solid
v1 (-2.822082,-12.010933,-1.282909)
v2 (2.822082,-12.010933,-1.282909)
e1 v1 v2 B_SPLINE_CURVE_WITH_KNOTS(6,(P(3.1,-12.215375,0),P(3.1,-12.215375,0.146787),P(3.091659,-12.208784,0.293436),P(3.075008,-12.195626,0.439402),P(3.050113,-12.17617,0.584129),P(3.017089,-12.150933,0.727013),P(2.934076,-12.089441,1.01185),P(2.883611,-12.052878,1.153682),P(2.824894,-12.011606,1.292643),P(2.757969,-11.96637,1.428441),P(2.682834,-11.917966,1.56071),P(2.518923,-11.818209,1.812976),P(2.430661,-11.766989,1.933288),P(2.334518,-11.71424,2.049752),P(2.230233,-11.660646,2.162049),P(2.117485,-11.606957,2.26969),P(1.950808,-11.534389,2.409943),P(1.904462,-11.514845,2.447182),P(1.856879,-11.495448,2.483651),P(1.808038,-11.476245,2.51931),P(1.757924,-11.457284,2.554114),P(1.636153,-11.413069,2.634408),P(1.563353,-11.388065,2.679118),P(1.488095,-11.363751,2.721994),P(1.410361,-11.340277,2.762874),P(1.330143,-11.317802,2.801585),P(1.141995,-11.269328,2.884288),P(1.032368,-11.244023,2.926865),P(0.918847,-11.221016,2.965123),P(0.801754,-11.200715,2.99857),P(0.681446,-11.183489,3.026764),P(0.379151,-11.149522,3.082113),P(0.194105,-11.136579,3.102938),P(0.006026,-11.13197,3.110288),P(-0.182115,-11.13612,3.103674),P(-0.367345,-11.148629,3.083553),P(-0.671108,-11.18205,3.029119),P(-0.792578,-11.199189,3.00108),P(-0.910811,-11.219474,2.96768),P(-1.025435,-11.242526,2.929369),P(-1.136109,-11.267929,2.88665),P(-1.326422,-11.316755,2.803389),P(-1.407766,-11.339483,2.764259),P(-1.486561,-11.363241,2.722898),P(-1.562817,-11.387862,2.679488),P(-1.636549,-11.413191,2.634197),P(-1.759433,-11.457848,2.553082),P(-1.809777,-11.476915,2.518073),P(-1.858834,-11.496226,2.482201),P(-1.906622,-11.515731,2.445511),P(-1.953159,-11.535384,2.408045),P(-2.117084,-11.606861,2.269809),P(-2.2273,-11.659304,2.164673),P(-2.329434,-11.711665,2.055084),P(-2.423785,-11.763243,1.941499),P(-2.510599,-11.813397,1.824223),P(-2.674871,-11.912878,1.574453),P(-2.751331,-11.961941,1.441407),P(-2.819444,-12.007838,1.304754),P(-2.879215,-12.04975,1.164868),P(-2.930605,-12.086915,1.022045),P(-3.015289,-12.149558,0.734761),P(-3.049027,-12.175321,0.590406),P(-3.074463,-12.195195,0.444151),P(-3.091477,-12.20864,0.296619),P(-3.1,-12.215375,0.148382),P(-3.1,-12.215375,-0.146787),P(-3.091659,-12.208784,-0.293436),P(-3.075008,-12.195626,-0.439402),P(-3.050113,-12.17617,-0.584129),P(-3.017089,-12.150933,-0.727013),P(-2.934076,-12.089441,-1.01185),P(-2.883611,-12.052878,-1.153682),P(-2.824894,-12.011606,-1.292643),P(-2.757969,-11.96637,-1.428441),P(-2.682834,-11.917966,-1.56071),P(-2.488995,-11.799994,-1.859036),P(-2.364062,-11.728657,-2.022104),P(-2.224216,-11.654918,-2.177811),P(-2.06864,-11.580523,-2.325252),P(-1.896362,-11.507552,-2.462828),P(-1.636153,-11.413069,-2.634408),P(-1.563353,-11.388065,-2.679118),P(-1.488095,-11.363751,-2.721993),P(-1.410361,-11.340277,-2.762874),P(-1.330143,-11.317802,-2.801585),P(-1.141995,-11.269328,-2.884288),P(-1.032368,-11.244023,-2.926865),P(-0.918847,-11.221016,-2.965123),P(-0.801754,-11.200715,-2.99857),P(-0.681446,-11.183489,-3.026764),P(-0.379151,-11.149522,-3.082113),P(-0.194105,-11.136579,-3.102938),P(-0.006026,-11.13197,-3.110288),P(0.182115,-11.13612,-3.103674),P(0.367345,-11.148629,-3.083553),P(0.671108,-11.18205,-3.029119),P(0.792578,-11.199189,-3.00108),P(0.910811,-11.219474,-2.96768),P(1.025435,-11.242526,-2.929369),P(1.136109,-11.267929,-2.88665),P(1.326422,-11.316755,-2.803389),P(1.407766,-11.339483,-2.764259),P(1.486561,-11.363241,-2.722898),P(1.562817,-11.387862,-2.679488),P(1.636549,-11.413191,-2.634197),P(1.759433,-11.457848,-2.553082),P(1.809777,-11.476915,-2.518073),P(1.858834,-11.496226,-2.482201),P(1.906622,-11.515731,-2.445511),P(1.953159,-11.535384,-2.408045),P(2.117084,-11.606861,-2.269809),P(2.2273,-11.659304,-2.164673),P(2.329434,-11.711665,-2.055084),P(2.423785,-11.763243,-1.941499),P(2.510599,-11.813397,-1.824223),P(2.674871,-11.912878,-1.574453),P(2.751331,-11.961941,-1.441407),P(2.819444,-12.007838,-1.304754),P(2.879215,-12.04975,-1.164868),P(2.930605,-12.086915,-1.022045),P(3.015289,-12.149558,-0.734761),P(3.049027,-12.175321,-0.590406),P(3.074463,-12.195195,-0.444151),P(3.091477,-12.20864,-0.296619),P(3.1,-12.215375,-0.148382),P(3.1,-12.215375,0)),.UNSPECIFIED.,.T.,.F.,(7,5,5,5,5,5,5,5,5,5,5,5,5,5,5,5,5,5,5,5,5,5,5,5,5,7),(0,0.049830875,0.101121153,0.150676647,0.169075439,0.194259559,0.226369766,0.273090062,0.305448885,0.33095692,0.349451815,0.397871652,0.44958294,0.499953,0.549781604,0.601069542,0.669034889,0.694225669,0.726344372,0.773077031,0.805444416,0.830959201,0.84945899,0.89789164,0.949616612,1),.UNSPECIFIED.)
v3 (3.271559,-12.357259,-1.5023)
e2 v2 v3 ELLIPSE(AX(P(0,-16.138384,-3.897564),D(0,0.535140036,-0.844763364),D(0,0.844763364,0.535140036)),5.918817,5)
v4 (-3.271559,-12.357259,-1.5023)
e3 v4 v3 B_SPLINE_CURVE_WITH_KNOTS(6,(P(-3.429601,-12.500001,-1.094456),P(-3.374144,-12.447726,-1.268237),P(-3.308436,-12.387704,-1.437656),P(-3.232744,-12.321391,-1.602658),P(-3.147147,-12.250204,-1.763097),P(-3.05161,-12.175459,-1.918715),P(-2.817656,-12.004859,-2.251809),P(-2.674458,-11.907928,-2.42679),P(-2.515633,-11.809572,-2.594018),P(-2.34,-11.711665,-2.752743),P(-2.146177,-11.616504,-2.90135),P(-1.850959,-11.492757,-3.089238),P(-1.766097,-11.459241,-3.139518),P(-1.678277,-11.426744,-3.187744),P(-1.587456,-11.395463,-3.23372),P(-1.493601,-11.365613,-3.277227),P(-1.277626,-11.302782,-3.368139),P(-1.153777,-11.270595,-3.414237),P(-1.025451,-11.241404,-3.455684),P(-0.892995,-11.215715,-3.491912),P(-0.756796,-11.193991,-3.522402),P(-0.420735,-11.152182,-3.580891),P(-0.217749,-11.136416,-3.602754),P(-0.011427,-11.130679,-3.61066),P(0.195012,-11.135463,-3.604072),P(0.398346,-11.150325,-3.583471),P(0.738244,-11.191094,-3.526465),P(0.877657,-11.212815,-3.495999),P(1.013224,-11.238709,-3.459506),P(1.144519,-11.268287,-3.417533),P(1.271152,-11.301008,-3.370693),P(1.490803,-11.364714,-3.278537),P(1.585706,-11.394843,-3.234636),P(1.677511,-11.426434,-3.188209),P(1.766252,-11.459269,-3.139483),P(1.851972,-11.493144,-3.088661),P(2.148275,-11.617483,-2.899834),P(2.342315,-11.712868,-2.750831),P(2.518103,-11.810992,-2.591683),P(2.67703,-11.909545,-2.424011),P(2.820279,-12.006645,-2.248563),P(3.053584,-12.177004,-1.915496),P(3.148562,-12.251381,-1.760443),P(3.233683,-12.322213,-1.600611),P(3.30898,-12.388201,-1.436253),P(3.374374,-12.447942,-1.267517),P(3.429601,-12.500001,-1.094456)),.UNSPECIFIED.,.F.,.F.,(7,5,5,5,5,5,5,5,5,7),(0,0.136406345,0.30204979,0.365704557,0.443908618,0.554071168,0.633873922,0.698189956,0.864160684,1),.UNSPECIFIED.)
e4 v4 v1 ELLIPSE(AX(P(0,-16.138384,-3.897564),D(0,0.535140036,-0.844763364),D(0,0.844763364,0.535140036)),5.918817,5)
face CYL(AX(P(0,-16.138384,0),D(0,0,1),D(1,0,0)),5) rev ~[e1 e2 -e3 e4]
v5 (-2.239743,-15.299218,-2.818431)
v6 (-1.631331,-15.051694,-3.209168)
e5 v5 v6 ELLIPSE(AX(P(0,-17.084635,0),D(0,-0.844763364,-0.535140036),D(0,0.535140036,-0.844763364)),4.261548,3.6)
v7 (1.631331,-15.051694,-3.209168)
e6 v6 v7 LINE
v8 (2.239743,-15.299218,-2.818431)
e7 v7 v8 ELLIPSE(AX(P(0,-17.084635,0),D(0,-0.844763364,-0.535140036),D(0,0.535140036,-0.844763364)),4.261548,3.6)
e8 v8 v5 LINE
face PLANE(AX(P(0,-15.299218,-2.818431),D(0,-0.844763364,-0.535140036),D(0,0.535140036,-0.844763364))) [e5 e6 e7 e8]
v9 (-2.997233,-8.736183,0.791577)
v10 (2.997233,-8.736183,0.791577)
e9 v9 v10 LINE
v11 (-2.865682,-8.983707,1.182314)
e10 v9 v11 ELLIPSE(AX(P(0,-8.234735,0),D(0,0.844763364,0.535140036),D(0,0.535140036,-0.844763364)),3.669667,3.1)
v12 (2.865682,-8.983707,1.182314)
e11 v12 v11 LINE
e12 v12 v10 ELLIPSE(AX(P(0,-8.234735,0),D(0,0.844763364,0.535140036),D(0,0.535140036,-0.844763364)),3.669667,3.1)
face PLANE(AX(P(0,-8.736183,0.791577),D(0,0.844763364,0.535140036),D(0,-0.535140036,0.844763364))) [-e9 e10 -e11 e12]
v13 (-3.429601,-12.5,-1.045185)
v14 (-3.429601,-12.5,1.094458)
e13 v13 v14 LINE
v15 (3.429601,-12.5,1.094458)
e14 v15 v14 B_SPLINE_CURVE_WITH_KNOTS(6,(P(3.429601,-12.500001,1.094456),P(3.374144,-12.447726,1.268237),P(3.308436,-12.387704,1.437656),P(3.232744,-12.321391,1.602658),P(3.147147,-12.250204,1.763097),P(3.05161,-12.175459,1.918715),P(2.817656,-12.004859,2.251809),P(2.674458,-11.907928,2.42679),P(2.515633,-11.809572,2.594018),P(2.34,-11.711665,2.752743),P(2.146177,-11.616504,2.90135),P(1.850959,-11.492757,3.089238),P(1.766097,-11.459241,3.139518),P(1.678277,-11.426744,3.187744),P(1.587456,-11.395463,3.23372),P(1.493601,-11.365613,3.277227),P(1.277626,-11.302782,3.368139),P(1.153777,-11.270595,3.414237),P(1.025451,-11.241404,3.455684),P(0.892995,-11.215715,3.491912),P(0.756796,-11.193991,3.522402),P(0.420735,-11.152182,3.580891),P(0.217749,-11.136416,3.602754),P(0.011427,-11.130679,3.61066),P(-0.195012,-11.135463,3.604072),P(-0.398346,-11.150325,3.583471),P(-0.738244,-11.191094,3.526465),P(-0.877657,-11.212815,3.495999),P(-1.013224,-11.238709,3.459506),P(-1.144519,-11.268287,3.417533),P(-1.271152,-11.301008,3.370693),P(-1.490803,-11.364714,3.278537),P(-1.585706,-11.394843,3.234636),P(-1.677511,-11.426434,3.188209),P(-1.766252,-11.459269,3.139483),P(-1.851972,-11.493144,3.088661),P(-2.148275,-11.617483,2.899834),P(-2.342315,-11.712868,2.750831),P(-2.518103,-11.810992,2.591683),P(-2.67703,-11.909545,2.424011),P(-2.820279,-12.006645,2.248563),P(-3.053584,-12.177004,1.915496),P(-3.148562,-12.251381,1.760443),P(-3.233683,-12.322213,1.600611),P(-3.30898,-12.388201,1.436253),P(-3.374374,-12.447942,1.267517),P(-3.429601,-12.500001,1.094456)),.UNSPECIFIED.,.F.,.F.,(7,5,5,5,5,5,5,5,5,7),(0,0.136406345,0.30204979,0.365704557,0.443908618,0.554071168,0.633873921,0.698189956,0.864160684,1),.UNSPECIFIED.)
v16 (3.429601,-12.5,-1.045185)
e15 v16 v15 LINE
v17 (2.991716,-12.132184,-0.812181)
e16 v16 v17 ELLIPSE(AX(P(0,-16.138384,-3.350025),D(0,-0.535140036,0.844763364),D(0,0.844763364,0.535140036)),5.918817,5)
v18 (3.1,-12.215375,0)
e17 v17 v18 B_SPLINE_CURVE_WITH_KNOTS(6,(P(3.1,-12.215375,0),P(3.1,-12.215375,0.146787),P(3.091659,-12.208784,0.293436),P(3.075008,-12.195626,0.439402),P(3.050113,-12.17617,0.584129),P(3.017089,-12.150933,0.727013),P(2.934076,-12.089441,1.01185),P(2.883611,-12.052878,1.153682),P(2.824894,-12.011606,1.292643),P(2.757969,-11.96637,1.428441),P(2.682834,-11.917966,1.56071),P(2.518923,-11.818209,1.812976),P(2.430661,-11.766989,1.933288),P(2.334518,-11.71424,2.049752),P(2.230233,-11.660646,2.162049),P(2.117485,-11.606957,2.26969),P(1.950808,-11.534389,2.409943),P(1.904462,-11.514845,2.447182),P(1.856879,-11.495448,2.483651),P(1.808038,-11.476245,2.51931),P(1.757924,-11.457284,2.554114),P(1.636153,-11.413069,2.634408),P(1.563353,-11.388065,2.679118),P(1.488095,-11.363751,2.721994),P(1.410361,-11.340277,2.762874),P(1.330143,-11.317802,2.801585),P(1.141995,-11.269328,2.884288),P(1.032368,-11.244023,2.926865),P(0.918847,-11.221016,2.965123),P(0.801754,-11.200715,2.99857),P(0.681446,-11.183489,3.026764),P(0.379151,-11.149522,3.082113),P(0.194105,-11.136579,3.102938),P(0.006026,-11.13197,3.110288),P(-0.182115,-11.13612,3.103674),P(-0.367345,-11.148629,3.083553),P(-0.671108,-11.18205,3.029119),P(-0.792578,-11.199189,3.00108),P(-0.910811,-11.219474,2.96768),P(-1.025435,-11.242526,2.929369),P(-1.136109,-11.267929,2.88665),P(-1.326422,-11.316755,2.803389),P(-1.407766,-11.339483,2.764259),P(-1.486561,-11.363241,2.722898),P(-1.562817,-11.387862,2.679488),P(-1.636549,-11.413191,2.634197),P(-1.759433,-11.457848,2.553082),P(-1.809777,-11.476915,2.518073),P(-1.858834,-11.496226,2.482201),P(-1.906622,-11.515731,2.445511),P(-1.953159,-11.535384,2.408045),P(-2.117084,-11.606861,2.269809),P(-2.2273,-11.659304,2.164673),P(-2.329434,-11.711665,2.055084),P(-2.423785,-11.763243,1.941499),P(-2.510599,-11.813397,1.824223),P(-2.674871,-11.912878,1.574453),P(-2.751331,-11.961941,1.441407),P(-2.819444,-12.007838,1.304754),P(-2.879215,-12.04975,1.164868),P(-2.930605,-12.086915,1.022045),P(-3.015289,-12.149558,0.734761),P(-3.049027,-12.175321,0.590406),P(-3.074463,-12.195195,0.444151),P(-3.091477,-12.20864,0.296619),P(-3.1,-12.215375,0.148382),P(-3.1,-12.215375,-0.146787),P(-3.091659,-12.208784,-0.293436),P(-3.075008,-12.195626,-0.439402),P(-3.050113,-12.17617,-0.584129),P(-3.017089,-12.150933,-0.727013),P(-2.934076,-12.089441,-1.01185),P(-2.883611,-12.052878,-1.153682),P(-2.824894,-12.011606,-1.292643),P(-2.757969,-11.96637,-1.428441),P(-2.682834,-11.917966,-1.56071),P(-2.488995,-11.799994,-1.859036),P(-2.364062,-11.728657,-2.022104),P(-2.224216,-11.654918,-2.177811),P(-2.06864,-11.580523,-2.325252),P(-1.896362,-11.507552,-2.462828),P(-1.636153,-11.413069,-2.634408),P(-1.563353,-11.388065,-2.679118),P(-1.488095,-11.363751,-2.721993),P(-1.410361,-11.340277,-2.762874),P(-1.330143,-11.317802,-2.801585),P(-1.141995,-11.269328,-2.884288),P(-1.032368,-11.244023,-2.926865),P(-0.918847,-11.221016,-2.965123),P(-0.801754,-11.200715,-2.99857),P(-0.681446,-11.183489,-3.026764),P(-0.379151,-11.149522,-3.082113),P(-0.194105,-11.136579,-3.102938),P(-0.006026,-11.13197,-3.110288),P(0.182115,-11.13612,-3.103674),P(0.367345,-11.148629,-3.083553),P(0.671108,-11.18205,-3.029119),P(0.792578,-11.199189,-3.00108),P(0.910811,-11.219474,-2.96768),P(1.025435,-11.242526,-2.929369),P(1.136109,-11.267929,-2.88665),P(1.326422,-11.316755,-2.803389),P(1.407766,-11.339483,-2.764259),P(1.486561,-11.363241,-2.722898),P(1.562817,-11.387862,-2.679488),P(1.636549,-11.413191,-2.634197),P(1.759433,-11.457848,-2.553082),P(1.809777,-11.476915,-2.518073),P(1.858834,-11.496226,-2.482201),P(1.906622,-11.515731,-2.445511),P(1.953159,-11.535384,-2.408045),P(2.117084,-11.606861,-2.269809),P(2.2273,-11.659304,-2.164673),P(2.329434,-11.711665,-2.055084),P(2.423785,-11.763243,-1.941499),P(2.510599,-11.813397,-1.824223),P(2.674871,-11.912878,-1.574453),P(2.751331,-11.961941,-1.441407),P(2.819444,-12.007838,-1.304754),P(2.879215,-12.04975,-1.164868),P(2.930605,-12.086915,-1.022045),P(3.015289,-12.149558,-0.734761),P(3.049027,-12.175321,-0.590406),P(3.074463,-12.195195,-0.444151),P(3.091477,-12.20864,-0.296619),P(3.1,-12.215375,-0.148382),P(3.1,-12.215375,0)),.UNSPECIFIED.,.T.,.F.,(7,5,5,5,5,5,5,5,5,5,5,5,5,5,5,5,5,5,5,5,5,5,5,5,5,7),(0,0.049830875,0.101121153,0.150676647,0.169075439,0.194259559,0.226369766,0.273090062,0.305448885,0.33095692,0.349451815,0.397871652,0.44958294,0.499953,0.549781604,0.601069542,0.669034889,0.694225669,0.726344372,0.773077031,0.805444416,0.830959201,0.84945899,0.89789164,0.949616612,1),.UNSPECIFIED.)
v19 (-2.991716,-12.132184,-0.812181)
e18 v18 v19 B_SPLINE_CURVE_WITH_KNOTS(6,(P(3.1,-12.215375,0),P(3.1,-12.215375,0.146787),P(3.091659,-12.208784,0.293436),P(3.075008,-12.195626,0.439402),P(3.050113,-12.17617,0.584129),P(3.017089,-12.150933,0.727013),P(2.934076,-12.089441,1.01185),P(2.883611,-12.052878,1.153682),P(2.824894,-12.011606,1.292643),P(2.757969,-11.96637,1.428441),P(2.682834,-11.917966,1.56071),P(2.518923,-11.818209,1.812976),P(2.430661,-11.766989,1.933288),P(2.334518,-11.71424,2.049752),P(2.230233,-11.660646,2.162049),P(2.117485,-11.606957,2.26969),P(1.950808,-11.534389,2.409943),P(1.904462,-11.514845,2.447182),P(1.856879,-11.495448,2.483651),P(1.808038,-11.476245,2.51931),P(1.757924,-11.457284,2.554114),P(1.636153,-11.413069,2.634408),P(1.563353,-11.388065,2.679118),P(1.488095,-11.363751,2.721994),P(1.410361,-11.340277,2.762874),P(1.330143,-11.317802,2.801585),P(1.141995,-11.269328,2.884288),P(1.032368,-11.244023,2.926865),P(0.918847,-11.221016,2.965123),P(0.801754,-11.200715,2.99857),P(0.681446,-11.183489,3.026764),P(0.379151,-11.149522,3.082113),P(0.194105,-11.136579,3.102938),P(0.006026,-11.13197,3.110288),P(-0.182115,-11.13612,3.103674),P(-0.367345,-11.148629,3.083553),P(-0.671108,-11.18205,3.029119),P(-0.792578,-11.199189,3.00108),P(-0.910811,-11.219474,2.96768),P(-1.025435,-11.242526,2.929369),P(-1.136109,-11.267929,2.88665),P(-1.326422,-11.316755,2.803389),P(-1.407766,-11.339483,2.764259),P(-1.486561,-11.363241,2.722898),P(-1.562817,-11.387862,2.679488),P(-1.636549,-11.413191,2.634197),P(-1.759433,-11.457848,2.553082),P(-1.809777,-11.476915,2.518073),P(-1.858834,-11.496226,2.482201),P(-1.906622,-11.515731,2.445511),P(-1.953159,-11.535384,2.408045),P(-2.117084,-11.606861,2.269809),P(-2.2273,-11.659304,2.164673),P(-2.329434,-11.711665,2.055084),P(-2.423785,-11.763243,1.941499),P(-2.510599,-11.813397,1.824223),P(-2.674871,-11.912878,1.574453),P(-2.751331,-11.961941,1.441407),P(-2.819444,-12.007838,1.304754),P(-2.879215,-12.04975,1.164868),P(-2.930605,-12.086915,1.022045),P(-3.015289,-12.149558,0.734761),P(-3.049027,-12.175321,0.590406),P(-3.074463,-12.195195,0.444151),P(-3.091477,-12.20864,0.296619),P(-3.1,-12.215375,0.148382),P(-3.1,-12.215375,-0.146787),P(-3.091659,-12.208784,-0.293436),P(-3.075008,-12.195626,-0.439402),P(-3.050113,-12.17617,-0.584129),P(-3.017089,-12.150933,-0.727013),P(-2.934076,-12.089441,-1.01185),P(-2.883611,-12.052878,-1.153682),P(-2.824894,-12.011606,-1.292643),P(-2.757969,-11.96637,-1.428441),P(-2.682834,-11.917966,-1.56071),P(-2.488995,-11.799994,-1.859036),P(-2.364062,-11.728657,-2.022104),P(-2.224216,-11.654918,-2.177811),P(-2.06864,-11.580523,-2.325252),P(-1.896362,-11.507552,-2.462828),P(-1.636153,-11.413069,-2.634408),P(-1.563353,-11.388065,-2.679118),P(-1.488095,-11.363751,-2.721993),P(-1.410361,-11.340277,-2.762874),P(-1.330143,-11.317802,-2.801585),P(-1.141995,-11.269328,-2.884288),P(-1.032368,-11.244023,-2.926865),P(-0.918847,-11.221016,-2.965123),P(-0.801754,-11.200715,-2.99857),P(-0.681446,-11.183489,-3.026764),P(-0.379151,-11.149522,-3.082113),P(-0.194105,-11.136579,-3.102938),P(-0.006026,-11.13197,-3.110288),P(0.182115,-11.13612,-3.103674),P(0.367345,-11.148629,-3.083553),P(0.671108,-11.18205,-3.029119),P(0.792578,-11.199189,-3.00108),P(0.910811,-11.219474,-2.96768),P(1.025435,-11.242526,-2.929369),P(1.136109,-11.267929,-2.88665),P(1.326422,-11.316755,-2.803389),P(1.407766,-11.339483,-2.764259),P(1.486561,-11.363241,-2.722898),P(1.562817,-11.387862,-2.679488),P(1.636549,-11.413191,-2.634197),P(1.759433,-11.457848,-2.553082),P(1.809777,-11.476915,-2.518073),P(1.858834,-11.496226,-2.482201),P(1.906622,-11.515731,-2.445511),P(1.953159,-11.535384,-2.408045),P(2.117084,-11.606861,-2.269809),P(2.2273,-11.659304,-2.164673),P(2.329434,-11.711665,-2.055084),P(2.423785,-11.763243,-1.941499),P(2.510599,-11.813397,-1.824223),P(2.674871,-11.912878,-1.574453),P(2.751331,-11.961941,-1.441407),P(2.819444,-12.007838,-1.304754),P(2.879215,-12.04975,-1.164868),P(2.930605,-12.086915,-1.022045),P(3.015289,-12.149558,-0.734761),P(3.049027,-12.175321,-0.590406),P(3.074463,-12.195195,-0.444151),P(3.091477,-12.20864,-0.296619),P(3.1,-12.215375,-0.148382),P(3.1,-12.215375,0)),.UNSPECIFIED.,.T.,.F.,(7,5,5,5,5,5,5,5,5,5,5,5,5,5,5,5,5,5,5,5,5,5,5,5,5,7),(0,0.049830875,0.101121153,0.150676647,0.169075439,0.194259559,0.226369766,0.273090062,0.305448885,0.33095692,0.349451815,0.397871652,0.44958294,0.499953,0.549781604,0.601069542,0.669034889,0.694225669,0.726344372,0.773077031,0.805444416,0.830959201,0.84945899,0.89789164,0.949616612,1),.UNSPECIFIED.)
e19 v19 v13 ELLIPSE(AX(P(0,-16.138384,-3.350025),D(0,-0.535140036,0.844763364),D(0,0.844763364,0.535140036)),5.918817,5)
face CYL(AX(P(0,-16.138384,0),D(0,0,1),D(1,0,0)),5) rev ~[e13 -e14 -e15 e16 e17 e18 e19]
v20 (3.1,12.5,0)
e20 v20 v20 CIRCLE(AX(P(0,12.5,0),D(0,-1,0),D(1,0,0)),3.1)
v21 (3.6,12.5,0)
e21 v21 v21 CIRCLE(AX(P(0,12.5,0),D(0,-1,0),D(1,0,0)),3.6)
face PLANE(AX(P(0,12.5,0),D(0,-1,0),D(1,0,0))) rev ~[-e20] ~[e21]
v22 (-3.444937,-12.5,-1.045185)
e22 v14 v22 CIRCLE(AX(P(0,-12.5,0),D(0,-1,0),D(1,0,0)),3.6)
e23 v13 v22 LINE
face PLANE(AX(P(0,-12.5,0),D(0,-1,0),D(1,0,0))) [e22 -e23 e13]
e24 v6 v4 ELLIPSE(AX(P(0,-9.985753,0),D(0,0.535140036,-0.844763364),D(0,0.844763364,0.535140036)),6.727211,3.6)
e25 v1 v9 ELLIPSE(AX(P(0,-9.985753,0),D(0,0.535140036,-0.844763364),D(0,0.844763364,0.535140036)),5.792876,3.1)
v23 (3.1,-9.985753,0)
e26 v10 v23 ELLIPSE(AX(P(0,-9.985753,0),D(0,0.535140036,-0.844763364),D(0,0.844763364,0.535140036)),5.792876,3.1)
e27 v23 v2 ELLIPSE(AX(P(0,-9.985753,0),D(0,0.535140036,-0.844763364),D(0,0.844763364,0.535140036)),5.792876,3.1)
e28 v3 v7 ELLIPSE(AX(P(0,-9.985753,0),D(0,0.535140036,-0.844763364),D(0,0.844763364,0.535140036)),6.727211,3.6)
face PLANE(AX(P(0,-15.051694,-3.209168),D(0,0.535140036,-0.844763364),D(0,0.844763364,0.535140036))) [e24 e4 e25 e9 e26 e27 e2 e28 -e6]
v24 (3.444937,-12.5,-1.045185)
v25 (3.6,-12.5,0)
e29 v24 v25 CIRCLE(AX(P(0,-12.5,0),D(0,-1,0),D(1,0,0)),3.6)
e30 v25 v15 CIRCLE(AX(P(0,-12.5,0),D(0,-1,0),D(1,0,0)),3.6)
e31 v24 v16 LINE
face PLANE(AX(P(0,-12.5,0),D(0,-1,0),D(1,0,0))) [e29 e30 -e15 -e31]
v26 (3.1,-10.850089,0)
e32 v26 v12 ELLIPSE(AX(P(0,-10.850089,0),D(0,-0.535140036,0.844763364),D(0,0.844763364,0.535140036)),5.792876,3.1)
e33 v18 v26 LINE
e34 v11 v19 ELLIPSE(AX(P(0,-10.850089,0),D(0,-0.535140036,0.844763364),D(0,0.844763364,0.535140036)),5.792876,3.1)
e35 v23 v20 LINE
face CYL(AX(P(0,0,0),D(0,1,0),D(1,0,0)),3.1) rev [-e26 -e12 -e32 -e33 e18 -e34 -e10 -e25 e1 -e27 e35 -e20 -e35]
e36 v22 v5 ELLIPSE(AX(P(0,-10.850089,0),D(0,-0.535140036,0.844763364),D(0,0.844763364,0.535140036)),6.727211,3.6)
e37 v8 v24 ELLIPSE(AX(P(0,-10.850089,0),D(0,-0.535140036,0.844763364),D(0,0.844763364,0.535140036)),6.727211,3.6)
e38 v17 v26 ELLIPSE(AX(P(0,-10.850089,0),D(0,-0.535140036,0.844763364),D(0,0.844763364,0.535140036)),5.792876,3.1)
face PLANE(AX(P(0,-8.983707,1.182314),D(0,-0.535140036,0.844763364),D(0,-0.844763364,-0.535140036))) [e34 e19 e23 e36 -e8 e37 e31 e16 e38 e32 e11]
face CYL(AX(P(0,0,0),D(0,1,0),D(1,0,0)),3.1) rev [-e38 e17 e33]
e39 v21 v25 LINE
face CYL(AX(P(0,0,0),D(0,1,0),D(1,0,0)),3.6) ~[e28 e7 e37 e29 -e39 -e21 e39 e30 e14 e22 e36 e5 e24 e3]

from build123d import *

# Parameters (mm, degrees)
F0_R     = 3.6
F0_R_2   = 3.1
F1_DEPTH = 12.5
F2_R     = 5
F3_DEPTH = 12.5
F5_DEPTH = 4
F6_R     = 5.6839494551
F6_R_2   = 3.6
F7_DEPTH = 25


# Not quite as in the source:
# - a feature names something its author has since deleted; it is built from what else it names


with BuildPart() as f1:
    # F0 (on Front) → F1 (new body, symmetric)
    with BuildSketch(Plane.XZ):
        Circle(F0_R)
        Circle(F0_R_2, mode=Mode.SUBTRACT)
    extrude(amount=F1_DEPTH, both=True)

    # F2 (on Top) → F3 (cut, symmetric)
    with BuildSketch(Plane.XY):
        with Locations((0, -16.1383841203)):
            Circle(F2_R)
    extrude(amount=F3_DEPTH, both=True, mode=Mode.SUBTRACT)

    # F4 (on Right) → F5 (join, symmetric)
    with BuildSketch(Plane.YZ):
        Polygon((-15.2992176846, -2.8184308636), (-15.0516938496, -3.2091679669), (-8.7361828689, 0.7915769966), (-8.9837067039, 1.1823140999), align=None)
    extrude(amount=F5_DEPTH, both=True)

    # F6 (on Front) → F7 (cut, symmetric)
    with BuildSketch(Plane.XZ):
        Circle(F6_R)
        Circle(F6_R_2, mode=Mode.SUBTRACT)
    extrude(amount=F7_DEPTH, both=True, mode=Mode.SUBTRACT)


solid = f1.part
